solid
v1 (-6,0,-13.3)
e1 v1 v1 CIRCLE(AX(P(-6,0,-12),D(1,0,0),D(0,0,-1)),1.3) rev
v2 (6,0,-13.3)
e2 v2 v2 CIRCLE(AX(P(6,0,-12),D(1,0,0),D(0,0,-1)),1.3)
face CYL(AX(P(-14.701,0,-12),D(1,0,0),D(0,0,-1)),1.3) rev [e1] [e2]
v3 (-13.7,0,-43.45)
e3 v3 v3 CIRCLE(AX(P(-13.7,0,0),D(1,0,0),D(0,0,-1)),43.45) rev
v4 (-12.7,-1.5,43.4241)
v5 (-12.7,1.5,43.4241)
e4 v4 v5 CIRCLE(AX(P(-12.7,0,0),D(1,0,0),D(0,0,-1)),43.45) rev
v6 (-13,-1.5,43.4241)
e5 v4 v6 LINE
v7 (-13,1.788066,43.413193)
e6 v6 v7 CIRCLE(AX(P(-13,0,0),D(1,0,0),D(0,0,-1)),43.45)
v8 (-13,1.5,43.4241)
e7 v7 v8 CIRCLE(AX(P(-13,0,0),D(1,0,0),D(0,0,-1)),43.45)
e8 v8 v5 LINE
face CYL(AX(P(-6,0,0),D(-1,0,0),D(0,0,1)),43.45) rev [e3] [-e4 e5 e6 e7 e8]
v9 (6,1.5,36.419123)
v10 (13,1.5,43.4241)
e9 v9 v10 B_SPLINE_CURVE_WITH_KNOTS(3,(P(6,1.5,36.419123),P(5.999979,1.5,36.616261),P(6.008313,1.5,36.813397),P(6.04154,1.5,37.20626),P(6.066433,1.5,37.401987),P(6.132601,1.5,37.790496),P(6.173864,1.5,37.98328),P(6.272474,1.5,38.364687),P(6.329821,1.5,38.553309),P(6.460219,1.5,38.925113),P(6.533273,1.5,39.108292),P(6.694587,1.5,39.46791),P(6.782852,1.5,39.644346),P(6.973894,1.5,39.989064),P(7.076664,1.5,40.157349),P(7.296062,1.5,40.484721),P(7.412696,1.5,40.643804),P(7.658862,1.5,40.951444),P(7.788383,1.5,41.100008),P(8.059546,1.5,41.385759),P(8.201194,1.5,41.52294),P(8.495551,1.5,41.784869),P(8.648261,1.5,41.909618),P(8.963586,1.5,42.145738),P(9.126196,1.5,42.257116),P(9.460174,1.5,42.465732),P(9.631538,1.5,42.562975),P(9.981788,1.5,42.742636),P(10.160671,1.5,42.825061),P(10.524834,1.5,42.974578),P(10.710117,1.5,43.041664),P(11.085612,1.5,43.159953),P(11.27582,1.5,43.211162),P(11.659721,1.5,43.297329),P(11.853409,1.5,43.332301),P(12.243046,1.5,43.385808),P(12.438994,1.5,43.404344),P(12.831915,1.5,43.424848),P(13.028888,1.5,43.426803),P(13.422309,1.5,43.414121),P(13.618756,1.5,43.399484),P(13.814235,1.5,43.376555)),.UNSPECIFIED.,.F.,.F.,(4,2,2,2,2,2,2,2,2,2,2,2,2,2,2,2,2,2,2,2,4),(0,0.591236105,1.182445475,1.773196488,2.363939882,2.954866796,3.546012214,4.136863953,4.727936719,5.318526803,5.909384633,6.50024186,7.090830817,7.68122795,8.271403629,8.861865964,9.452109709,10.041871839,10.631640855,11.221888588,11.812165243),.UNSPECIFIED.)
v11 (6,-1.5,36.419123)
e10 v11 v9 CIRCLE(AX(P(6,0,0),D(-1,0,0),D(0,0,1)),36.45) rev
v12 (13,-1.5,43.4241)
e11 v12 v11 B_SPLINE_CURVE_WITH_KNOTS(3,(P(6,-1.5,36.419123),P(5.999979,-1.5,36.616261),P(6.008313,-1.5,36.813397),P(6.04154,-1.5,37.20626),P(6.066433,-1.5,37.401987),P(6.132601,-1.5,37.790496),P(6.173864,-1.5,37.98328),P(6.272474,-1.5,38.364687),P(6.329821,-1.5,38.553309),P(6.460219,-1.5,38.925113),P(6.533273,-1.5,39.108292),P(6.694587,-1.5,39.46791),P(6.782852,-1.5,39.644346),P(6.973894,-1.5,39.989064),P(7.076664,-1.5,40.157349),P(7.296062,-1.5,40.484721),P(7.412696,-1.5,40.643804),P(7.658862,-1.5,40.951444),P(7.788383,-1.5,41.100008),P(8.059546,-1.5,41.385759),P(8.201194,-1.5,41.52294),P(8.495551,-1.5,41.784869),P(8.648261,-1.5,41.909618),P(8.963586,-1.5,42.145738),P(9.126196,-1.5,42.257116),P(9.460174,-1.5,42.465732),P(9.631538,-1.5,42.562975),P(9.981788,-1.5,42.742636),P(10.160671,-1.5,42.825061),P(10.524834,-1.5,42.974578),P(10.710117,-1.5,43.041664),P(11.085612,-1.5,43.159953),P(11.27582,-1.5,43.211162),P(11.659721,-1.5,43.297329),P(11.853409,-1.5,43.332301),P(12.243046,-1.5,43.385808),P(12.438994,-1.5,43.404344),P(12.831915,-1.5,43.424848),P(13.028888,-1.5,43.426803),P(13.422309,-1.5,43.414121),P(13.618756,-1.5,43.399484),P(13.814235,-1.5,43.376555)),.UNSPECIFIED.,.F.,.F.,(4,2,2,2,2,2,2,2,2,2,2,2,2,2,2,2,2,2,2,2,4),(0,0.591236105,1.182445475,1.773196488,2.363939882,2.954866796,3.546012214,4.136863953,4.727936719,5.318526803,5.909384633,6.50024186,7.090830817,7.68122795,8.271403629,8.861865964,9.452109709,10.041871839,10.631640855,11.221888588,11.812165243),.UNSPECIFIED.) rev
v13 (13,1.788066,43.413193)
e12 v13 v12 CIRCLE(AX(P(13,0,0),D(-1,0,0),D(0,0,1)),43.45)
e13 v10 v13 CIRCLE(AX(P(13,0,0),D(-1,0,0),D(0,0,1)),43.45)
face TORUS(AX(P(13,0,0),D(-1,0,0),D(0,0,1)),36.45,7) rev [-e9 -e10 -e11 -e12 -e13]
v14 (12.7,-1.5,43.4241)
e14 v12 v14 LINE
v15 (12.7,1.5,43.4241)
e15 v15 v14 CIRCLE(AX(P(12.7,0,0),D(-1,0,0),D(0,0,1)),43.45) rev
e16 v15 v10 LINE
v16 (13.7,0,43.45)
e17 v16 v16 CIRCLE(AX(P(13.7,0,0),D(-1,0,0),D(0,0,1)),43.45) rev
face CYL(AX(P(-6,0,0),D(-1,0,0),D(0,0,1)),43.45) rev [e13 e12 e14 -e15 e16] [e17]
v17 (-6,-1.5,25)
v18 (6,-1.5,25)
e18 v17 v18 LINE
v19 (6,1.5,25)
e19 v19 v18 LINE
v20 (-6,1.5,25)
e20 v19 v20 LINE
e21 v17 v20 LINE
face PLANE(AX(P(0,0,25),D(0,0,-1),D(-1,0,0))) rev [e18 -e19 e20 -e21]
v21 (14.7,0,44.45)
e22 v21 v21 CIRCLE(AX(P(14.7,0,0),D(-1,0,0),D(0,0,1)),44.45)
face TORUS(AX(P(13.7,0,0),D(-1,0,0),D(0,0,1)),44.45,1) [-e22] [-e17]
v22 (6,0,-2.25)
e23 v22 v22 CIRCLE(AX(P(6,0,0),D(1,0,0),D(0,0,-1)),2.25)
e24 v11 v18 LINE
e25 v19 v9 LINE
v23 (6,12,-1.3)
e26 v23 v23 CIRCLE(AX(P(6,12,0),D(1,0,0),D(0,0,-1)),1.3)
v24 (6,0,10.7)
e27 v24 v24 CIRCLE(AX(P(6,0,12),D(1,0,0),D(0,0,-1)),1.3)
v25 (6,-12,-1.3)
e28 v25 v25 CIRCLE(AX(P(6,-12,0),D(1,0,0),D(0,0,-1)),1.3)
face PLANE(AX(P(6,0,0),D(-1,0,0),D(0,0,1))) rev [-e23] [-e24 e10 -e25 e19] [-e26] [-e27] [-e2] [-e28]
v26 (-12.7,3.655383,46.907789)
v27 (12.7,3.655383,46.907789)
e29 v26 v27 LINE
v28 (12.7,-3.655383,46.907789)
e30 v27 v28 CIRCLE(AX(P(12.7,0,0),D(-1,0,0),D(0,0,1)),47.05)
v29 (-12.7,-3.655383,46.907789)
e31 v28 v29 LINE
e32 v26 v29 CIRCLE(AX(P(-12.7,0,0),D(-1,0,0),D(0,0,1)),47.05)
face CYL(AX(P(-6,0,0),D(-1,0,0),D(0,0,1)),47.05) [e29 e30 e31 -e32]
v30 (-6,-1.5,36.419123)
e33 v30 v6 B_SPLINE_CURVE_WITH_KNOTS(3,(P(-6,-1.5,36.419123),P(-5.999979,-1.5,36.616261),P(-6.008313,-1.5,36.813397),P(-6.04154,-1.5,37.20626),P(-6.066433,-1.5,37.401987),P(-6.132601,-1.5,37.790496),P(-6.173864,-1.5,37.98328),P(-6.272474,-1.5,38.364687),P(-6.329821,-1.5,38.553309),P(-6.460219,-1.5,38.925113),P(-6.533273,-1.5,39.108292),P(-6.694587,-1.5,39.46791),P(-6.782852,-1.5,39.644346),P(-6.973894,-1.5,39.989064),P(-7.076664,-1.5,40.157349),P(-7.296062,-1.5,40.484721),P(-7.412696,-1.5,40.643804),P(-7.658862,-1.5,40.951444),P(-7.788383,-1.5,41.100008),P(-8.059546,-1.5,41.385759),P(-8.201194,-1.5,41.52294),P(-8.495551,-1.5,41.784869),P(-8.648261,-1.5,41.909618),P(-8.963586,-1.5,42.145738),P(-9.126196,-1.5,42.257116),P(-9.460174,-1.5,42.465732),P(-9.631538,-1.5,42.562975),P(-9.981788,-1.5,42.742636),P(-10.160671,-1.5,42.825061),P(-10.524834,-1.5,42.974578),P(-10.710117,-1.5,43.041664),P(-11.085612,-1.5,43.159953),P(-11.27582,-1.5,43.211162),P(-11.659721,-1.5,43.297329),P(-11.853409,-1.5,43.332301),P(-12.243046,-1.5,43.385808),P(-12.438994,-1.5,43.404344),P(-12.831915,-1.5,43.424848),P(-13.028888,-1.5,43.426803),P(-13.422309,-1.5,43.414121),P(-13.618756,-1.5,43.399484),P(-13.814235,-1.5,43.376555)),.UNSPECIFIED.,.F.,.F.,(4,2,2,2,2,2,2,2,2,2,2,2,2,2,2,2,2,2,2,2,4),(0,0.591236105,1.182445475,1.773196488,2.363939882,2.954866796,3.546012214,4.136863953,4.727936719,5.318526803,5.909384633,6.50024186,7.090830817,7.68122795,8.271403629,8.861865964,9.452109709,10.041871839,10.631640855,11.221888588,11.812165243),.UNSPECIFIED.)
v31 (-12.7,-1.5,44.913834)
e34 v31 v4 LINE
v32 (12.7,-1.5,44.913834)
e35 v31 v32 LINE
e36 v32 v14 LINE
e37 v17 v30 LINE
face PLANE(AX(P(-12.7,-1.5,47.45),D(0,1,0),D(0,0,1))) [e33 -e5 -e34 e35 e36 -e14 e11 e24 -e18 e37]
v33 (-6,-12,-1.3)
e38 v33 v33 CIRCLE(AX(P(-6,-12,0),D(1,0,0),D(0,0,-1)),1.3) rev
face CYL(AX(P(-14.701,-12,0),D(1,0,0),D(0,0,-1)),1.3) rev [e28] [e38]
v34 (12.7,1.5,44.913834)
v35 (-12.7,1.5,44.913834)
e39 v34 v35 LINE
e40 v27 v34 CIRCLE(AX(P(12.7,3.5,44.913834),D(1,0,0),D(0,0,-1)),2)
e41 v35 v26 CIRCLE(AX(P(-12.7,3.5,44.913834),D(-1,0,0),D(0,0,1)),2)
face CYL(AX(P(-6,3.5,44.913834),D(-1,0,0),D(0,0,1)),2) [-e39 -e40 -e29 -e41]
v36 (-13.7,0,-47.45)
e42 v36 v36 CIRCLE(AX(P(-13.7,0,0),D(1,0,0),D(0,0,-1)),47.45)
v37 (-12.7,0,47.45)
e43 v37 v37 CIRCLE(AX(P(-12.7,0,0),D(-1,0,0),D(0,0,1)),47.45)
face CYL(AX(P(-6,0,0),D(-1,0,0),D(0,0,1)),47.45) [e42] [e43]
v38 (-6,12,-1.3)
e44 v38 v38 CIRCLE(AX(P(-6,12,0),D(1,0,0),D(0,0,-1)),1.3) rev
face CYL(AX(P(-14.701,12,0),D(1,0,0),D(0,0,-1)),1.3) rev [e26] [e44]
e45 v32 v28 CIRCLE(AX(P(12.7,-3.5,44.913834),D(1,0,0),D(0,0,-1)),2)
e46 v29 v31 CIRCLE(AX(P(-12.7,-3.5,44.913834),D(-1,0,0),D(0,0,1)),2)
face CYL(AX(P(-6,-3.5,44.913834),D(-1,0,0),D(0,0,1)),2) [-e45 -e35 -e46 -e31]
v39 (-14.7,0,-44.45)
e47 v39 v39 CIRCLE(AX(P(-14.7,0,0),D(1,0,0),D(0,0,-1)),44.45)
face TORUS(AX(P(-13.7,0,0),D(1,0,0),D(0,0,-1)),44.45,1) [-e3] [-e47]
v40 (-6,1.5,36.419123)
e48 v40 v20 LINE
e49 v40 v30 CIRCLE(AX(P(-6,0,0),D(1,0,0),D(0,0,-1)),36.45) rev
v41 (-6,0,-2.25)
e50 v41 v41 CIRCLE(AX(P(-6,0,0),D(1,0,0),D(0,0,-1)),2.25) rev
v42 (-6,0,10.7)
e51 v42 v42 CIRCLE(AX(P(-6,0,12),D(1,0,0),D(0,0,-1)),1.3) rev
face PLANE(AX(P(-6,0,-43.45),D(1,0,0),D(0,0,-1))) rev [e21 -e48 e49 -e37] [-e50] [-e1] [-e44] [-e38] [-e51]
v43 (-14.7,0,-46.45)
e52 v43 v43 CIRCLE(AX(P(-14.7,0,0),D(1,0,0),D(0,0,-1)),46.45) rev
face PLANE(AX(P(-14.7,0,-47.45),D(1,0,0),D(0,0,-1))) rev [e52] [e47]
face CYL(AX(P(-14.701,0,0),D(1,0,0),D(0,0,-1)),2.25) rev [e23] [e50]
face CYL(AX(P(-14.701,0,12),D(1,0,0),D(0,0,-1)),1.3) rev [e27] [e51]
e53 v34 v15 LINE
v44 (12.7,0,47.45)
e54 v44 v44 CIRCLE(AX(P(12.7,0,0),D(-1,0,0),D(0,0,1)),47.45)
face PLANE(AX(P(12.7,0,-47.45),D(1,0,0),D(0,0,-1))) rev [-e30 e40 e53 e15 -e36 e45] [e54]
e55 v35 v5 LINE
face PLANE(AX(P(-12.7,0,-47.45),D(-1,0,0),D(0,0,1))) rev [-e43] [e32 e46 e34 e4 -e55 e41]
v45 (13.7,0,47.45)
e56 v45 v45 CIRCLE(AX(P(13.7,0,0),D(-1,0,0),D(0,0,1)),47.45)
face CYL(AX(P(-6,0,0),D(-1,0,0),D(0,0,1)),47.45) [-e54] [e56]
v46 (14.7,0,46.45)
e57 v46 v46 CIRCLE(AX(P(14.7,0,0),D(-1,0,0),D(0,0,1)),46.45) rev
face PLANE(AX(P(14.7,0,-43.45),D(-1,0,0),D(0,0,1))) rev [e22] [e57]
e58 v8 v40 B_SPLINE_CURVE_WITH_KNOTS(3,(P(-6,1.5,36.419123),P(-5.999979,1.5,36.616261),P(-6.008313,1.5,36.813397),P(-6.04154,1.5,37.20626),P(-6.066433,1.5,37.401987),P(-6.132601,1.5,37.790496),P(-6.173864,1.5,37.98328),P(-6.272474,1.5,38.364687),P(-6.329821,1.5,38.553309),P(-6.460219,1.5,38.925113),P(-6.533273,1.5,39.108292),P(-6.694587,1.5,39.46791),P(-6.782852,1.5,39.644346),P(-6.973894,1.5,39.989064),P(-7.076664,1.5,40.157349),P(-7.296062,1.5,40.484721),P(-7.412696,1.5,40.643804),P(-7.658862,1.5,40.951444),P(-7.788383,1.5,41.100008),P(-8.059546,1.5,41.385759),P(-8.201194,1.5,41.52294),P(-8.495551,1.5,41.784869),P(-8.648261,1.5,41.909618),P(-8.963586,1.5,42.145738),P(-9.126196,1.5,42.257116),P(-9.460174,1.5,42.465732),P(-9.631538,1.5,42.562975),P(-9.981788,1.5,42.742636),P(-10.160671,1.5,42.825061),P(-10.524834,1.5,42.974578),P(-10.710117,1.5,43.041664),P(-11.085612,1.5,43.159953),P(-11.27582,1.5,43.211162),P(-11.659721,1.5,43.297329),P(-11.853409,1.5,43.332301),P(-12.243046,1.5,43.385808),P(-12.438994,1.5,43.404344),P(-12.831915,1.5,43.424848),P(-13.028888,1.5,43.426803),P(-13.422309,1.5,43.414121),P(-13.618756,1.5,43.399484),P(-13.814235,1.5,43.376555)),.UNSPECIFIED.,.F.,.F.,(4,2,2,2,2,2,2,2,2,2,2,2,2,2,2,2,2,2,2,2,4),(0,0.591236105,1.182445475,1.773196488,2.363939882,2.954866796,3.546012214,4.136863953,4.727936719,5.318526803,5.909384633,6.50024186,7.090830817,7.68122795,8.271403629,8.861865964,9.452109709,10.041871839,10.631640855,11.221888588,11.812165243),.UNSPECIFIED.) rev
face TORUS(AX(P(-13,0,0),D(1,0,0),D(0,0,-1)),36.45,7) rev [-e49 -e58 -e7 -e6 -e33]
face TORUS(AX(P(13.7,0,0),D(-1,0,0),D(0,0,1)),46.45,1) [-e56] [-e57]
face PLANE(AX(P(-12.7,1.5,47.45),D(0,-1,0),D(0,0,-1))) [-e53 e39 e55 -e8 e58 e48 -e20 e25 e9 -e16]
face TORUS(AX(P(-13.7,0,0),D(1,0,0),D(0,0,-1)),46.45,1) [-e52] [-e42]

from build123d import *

# Parameters (mm, degrees)
CUT_EXTRUDE1_REACH = 72.225
SKETCH3_R          = 2.25
SKETCH3_R_2        = 1.3
CUT_EXTRUDE2_START = 25
SKETCH6_W          = 25.4
SKETCH6_H          = 3
CUT_EXTRUDE2_DEPTH = 44.695669441
FILLET1_R          = 1
FILLET2_START      = -14
FILLET2_2_DEPTH    = 28
FILLET3_R          = 2


with BuildPart() as part:
    # Sketch2 → Revolve1 (revolve)
    with BuildSketch(Plane(origin=(0, 0, 0), x_dir=(1, 0, 0), z_dir=(0, 1, 0)), mode=Mode.PRIVATE) as revolve1_sk:
        Polygon((-6, 0), (6, 0), (6, 43.45), (14.7, 43.45), (14.7, 47.45), (12.7, 47.45), (12.7, 47.05), (-12.7, 47.05), (-12.7, 47.45), (-14.7, 47.45), (-14.7, 43.45), (-6, 43.45), align=None)
    revolve(revolve1_sk.sketch.rotate(Axis((-6, 0, 0), (1, 0, 0)), 180), axis=Axis((-6, 0, 0), (1, 0, 0)))

    # Sketch3 → Cut-Extrude1 (cut, up to next)
    with BuildSketch(Plane(origin=(6, 0, 0), x_dir=(0, 0, -1), z_dir=(1, 0, 0)), mode=Mode.PRIVATE) as cut_extrude1_sk1:
        Circle(SKETCH3_R)
    cut_extrude1_tool1 = extrude(cut_extrude1_sk1.sketch, amount=-CUT_EXTRUDE1_REACH, mode=Mode.PRIVATE) & part.part
    # Sketch3 → Cut-Extrude1 (cut, up to next)
    with BuildSketch(Plane(origin=(6, 0, 0), x_dir=(0, 0, -1), z_dir=(1, 0, 0)), mode=Mode.PRIVATE) as cut_extrude1_sk2:
        with Locations((0, 12)):
            Circle(SKETCH3_R_2)
    cut_extrude1_tool2 = extrude(cut_extrude1_sk2.sketch, amount=-CUT_EXTRUDE1_REACH, mode=Mode.PRIVATE) & part.part
    # Sketch3 → Cut-Extrude1 (cut, up to next)
    with BuildSketch(Plane(origin=(6, 0, 0), x_dir=(0, 0, -1), z_dir=(1, 0, 0)), mode=Mode.PRIVATE) as cut_extrude1_sk3:
        with Locations((-12, 0)):
            Circle(SKETCH3_R_2)
    cut_extrude1_tool3 = extrude(cut_extrude1_sk3.sketch, amount=-CUT_EXTRUDE1_REACH, mode=Mode.PRIVATE) & part.part
    # Sketch3 → Cut-Extrude1 (cut, up to next)
    with BuildSketch(Plane(origin=(6, 0, 0), x_dir=(0, 0, -1), z_dir=(1, 0, 0)), mode=Mode.PRIVATE) as cut_extrude1_sk4:
        with Locations((0, -12)):
            Circle(SKETCH3_R_2)
    cut_extrude1_tool4 = extrude(cut_extrude1_sk4.sketch, amount=-CUT_EXTRUDE1_REACH, mode=Mode.PRIVATE) & part.part
    # Sketch3 → Cut-Extrude1 (cut, up to next)
    with BuildSketch(Plane(origin=(6, 0, 0), x_dir=(0, 0, -1), z_dir=(1, 0, 0)), mode=Mode.PRIVATE) as cut_extrude1_sk5:
        with Locations((12, 0)):
            Circle(SKETCH3_R_2)
    cut_extrude1_tool5 = extrude(cut_extrude1_sk5.sketch, amount=-CUT_EXTRUDE1_REACH, mode=Mode.PRIVATE) & part.part
    add(cut_extrude1_tool1.solids().sort_by_distance((6, 0, 0))[0], mode=Mode.SUBTRACT)
    add(cut_extrude1_tool2.solids().sort_by_distance((6, 12, 0))[0], mode=Mode.SUBTRACT)
    add(cut_extrude1_tool3.solids().sort_by_distance((6, 0, 12))[0], mode=Mode.SUBTRACT)
    add(cut_extrude1_tool4.solids().sort_by_distance((6, -12, 0))[0], mode=Mode.SUBTRACT)
    add(cut_extrude1_tool5.solids().sort_by_distance((6, 0, -12))[0], mode=Mode.SUBTRACT)

    # Sketch6 → Cut-Extrude2 (cut, through all)
    with BuildSketch(Plane.XY.offset(CUT_EXTRUDE2_START)):
        Rectangle(SKETCH6_W, SKETCH6_H)
    extrude(amount=CUT_EXTRUDE2_DEPTH, mode=Mode.SUBTRACT)

    # Fillet1
    fillet1_edges = [part.edges().sort_by_distance(p)[0] for p in [
        (14.7, 0, -47.45),
        (-14.7, 0, -47.45),
        (-14.7, 0, -43.45),
        (14.7, 0, -43.45),
    ]]
    fillet(fillet1_edges, radius=FILLET1_R)

    # Fillet2: read off the stored shape, not the designer's step
    # Fillet2 outline → Fillet2 (revolve)
    with BuildSketch(Plane.YX):
        with BuildLine():
            ThreePointArc((36.45, -6), (41.399747468, -8.050252532), (43.45, -13))
            Line((43.45, -13), (43.45, -6))
            Line((43.45, -6), (36.45, -6))
        make_face()
        with BuildLine():
            ThreePointArc((43.45, 13), (41.399747468, 8.050252532), (36.45, 6))
            Line((36.45, 6), (43.45, 6))
            Line((43.45, 6), (43.45, 13))
        make_face()
    revolve(axis=Axis((0, 0, 0), (1, 0, 0)))

    # Fillet2 2 outline → Fillet2 2 (cut)
    with BuildSketch(Plane.YZ.offset(FILLET2_START)):
        with BuildLine():
            ThreePointArc((-1.5, 36.419122724), (0, 36.45), (1.5, 36.419122724))
            Line((1.5, 36.419122724), (1.5, 43.424100451))
            ThreePointArc((1.5, 43.424100451), (0, 43.45), (-1.5, 43.424100451))
            Line((-1.5, 43.424100451), (-1.5, 36.419122724))
        make_face()
    extrude(amount=FILLET2_2_DEPTH, mode=Mode.SUBTRACT)

    # Fillet3
    fillet3_edges = [part.edges().sort_by_distance(p)[0] for p in [
        (0, 1.5, 47.026083188),
        (0, -1.5, 47.026083188),
    ]]
    fillet(fillet3_edges, radius=FILLET3_R)


solid = part.part
